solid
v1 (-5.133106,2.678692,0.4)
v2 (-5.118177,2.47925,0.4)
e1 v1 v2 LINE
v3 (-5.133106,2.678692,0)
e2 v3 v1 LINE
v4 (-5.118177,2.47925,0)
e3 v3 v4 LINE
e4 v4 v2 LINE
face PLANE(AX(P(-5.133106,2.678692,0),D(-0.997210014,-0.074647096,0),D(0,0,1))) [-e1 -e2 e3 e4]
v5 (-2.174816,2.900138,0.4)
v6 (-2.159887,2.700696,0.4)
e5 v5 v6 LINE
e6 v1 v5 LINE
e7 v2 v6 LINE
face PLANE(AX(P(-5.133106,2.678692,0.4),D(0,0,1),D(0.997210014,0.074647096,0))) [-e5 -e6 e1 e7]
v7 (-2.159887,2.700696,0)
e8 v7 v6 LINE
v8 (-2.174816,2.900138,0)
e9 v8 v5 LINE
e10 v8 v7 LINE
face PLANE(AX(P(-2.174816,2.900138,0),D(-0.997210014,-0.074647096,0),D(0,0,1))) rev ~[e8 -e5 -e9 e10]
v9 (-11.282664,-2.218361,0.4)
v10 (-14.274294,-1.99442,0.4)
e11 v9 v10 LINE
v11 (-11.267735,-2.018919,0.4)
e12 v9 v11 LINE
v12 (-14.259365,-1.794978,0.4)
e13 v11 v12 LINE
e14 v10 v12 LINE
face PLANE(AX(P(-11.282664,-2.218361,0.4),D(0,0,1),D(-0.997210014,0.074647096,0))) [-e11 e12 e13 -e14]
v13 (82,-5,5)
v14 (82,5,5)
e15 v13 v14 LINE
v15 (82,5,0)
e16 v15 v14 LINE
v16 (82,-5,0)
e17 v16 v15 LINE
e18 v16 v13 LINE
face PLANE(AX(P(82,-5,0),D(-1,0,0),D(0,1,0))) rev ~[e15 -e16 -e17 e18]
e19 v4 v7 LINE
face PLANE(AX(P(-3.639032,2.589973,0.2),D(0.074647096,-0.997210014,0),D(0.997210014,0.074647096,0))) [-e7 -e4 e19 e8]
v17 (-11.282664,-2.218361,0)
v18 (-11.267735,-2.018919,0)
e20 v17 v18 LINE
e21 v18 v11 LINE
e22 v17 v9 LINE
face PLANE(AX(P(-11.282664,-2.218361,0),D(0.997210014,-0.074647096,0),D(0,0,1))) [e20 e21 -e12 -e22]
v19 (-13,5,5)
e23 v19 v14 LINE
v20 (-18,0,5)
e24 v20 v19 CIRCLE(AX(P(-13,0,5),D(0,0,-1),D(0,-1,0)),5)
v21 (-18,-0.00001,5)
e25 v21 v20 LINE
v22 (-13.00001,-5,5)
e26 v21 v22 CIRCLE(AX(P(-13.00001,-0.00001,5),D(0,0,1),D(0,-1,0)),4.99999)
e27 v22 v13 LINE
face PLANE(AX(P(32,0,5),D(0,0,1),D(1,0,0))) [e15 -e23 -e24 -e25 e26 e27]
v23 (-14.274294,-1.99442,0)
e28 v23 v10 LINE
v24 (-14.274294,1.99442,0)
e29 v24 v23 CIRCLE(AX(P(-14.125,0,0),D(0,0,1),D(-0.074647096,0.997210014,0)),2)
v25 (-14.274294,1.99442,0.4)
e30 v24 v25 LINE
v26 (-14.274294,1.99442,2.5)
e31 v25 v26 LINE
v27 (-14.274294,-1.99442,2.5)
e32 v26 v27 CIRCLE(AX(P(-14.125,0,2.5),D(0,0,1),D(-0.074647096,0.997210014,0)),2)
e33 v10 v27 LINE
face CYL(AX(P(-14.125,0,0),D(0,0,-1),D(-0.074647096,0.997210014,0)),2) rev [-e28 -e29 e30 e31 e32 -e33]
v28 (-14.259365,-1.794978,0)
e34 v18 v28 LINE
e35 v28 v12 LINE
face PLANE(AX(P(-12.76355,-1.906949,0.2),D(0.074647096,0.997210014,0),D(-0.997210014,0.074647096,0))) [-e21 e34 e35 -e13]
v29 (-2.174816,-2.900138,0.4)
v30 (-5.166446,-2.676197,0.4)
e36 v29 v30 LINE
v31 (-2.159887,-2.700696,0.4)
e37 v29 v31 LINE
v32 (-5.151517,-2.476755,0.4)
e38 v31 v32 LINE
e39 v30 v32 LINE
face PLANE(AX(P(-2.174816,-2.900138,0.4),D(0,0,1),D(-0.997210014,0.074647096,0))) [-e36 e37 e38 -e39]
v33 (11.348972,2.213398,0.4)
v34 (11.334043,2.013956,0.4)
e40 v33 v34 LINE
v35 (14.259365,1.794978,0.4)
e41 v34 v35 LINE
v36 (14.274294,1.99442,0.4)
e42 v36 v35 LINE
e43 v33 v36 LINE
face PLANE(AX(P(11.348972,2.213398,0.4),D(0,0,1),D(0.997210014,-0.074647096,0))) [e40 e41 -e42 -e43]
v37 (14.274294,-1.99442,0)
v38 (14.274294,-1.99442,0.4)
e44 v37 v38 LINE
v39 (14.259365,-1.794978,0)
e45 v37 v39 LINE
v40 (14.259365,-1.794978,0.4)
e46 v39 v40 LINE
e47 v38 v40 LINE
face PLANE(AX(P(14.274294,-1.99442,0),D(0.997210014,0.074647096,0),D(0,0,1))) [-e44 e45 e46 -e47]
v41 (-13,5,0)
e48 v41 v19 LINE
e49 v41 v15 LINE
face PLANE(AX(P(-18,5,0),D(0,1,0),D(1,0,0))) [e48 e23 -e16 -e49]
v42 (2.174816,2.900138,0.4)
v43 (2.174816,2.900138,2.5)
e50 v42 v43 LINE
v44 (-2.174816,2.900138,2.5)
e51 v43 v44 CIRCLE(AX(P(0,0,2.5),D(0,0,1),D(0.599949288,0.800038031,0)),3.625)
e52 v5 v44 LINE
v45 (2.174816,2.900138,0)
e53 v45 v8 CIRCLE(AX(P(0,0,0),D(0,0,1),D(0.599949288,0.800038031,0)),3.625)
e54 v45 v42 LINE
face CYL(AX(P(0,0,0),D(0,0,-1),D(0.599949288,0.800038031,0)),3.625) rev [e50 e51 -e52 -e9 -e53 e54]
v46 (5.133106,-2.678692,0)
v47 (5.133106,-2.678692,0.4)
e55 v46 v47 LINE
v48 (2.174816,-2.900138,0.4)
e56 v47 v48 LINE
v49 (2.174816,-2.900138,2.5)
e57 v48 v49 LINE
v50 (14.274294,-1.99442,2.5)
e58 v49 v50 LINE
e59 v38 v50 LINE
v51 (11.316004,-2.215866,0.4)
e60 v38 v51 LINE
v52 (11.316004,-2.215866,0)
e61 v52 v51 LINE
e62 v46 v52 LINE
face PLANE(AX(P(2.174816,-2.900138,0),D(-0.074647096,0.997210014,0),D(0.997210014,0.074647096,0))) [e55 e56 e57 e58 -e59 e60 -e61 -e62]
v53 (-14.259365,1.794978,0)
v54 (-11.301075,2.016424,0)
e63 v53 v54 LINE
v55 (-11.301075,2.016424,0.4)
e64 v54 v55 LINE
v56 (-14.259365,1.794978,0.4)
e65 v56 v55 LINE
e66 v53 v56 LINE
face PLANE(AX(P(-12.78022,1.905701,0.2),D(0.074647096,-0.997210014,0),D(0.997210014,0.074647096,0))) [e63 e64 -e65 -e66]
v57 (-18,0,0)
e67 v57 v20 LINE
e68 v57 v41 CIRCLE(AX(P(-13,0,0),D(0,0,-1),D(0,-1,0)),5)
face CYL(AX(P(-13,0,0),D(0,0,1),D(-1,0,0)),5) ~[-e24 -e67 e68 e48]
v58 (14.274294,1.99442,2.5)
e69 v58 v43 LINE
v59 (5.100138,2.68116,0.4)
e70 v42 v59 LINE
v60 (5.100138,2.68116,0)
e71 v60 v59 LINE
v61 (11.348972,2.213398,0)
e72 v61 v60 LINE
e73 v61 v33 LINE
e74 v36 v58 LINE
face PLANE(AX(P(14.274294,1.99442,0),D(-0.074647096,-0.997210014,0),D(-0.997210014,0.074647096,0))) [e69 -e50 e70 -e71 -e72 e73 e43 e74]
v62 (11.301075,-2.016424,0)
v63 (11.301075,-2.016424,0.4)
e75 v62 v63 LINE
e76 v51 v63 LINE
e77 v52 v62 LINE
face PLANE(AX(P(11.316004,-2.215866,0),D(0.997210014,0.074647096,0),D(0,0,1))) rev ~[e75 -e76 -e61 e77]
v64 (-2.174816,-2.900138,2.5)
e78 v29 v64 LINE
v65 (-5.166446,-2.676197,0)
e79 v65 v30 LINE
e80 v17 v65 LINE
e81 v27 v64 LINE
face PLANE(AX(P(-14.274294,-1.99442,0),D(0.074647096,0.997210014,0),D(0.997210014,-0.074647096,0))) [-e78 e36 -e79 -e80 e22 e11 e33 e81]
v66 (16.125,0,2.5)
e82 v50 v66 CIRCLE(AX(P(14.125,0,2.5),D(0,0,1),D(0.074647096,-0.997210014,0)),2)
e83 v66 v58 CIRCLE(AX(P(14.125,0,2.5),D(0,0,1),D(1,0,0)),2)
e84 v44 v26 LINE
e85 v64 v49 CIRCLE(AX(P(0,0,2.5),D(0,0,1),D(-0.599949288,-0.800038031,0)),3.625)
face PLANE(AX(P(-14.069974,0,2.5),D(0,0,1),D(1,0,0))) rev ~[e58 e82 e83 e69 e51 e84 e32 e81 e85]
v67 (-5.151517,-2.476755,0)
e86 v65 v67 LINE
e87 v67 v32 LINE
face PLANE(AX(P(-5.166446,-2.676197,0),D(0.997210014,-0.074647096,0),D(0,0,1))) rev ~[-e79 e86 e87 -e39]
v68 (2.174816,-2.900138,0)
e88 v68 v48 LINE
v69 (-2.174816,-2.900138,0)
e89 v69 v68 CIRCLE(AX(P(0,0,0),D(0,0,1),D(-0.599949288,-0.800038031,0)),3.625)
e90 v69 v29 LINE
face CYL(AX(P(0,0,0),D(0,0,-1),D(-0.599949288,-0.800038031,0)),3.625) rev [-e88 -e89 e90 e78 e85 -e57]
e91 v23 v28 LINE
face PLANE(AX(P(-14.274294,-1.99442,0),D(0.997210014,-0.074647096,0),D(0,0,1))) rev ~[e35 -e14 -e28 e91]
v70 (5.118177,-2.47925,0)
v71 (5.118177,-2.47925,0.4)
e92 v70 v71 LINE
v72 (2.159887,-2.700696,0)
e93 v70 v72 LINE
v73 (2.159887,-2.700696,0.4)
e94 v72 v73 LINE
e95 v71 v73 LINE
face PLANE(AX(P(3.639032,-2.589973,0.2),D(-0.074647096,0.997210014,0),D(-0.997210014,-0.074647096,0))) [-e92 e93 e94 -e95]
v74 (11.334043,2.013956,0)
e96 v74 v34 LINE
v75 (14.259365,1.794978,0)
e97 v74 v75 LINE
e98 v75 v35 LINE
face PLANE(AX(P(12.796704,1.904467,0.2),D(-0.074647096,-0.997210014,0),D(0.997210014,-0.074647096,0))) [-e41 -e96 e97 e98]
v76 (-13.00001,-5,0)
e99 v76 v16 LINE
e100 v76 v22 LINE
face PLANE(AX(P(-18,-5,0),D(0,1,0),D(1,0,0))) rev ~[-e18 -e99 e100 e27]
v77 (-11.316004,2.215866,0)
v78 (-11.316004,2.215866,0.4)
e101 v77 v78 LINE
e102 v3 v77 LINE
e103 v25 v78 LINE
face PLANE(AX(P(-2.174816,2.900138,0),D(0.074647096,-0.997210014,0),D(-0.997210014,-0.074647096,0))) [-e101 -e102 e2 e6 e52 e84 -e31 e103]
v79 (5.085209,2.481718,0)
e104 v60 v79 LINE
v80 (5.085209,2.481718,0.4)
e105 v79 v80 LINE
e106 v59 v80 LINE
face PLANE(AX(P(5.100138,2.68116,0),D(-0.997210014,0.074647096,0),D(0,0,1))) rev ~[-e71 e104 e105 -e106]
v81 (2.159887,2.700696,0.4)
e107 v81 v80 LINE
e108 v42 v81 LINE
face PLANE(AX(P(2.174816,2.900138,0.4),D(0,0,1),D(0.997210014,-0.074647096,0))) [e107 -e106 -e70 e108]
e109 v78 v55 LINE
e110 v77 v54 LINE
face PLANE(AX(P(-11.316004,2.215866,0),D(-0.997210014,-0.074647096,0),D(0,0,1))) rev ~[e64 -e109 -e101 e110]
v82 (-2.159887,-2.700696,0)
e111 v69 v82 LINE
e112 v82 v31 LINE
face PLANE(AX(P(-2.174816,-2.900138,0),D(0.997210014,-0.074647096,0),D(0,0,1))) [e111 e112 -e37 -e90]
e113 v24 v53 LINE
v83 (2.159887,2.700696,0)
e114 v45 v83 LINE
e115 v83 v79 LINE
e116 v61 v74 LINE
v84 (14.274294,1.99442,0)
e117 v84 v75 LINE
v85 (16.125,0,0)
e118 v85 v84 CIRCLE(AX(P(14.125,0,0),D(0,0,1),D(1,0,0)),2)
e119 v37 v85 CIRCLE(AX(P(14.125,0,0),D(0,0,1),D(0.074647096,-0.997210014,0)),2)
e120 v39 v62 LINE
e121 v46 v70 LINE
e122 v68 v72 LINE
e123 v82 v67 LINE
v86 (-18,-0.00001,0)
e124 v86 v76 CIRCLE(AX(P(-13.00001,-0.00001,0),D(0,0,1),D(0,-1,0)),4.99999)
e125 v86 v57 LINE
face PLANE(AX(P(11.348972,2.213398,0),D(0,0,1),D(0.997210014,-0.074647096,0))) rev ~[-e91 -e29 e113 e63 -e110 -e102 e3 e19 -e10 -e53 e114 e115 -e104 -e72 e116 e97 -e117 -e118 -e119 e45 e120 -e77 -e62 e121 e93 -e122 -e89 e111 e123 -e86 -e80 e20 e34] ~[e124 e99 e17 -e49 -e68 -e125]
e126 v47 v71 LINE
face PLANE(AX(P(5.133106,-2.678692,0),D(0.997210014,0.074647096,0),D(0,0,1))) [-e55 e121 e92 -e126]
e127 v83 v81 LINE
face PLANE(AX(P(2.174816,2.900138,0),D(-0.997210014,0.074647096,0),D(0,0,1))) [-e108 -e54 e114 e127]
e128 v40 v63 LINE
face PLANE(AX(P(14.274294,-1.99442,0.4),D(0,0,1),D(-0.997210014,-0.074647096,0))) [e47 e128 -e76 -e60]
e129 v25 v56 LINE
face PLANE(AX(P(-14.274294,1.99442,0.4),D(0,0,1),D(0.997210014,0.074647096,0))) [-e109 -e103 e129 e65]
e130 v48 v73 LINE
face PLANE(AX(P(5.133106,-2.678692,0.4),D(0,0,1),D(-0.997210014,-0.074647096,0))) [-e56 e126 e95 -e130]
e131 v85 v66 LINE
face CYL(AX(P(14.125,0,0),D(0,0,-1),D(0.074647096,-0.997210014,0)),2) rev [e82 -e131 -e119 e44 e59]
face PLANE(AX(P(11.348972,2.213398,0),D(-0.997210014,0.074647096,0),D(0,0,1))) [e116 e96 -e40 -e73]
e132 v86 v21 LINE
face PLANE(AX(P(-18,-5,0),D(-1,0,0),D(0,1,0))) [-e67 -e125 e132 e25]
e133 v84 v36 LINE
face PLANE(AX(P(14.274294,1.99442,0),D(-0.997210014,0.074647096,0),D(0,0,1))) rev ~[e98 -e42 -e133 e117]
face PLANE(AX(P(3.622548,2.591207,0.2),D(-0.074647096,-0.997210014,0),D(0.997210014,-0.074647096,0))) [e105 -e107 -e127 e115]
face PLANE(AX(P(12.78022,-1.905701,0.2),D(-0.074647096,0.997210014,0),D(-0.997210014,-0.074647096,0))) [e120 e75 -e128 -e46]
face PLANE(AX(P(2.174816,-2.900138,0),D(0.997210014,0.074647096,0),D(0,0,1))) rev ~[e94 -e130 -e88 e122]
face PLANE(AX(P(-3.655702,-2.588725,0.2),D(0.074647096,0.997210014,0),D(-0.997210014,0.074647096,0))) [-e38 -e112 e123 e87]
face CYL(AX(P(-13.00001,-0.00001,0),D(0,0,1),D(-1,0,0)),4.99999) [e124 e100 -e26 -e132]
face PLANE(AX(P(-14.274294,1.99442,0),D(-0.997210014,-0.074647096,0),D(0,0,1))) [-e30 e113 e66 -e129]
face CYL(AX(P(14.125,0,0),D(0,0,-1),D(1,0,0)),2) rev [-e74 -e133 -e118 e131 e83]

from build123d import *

# Parameters (mm, degrees)
F1_W      = 100
F1_H      = 10
F2_DEPTH  = 5
F3_DEPTH  = 2.5
F4_R      = 5
F5_R      = 4.99999
F6_W      = 3
F6_H      = 0.4
F7_DEPTH  = 0.2
F8_W      = 2.9665668664
F8_H      = 0.4
F9_DEPTH  = 0.2
F10_W     = 2.9665668664
F10_H     = 0.4
F11_DEPTH = 0.2
F12_W     = 2.9335063244
F12_H     = 0.4
F13_DEPTH = 0.2


# Not quite as in the source:
# - a fillet or chamfer is up to 0.001 mm smaller than in the source, because OpenCascade refuses the exact size


with BuildPart() as f2:
    # F1 (on Top) → F2 (new body)
    with BuildSketch(Plane.XY):
        with Locations((32, 0)):
            Rectangle(F1_W, F1_H)
    extrude(amount=F2_DEPTH)

    # F0 (on Top) → F3 (cut)
    with BuildSketch(Plane.XY):
        with BuildLine():
            ThreePointArc((-14.2742941918, -1.9944200271), (-12.7645935136, -1.4660471315), (-12.125, 0))
            ThreePointArc((-12.125, 0), (-12.7645935136, 1.4660471315), (-14.2742941918, 1.9944200271))
            ThreePointArc((-14.2742941918, 1.9944200271), (-16.125, 0), (-14.2742941918, -1.9944200271))
        make_face()
        with BuildLine():
            ThreePointArc((-14.2742941918, 1.9944200271), (-12.7645935136, 1.4660471315), (-12.125, 0))
            ThreePointArc((-12.125, 0), (-12.7645935136, -1.4660471315), (-14.2742941918, -1.9944200271))
            Line((-14.2742941918, -1.9944200271), (-2.1748161696, -2.9001378637))
            ThreePointArc((-2.1748161696, -2.9001378637), (-3.625, 0), (-2.1748161696, 2.9001378637))
            Line((-2.1748161696, 2.9001378637), (-14.2742941918, 1.9944200271))
        make_face()
        with BuildLine():
            Line((0, 3.0629357789), (-2.1748161696, 2.9001378637))
            ThreePointArc((-2.1748161696, 2.9001378637), (-3.625, 0), (-2.1748161696, -2.9001378637))
            Line((-2.1748161696, -2.9001378637), (0, -3.0629357789))
            Line((0, -3.0629357789), (2.1748161696, -2.9001378637))
            ThreePointArc((2.1748161696, -2.9001378637), (3.2422471848, -1.6212520448), (3.625, 0))
            ThreePointArc((3.625, 0), (3.2422471848, 1.6212520448), (2.1748161696, 2.9001378637))
            Line((2.1748161696, 2.9001378637), (0, 3.0629357789))
        make_face()
        with BuildLine():
            ThreePointArc((2.1748161696, 2.9001378637), (0, 3.625), (-2.1748161696, 2.9001378637))
            Line((-2.1748161696, 2.9001378637), (0, 3.0629357789))
            Line((0, 3.0629357789), (2.1748161696, 2.9001378637))
        make_face()
        with BuildLine():
            Line((0, -3.0629357789), (-2.1748161696, -2.9001378637))
            ThreePointArc((-2.1748161696, -2.9001378637), (0, -3.625), (2.1748161696, -2.9001378637))
            Line((2.1748161696, -2.9001378637), (0, -3.0629357789))
        make_face()
        with BuildLine():
            Line((14.2742941918, 1.9944200271), (2.1748161696, 2.9001378637))
            ThreePointArc((2.1748161696, 2.9001378637), (3.2422471848, 1.6212520448), (3.625, 0))
            ThreePointArc((3.625, 0), (3.2422471848, -1.6212520448), (2.1748161696, -2.9001378637))
            Line((2.1748161696, -2.9001378637), (14.2742941918, -1.9944200271))
            ThreePointArc((14.2742941918, -1.9944200271), (12.125, 0), (14.2742941918, 1.9944200271))
        make_face()
        with BuildLine():
            ThreePointArc((16.125, 0), (15.5910471315, 1.3604064864), (14.2742941918, 1.9944200271))
            ThreePointArc((14.2742941918, 1.9944200271), (12.125, 0), (14.2742941918, -1.9944200271))
            ThreePointArc((14.2742941918, -1.9944200271), (15.5910471315, -1.3604064864), (16.125, 0))
        make_face()
    extrude(amount=F3_DEPTH, mode=Mode.SUBTRACT)

    # F4
    f4_edges = [f2.edges().sort_by_distance(p)[0] for p in [
        (-18, 5, 2.5),
    ]]
    fillet(f4_edges, radius=F4_R)

    # F5 (radius 5 in the source; OpenCascade refuses exactly that, so slightly less here)
    f5_edges = [f2.edges().sort_by_distance(p)[0] for p in [
        (-18, -5, 2.5),
    ]]
    fillet(f5_edges, radius=F5_R)

    # F6 (on face) → F7 (join)
    with BuildSketch(Plane(origin=(-0.2280013604, -3.045868522, 0), x_dir=(-0.9972100135, 0.0746470959, 0), z_dir=(0.0746470959, 0.9972100135, 0))):
        with Locations((12.585591441, 0.2)):
            Rectangle(F6_W, F6_H)
        with Locations((3.4522615926, 0.2)):
            Rectangle(F6_W, F6_H)
    extrude(amount=F7_DEPTH)

    # F8 (on face) → F9 (join)
    with BuildSketch(Plane(origin=(0.2280013604, -3.045868522, 0), x_dir=(-0.9972100135, -0.0746470959, 0), z_dir=(-0.0746470959, 0.9972100135, 0))):
        with Locations((-3.4355450259, 0.2)):
            Rectangle(F8_W, F8_H)
        with Locations((-12.6023080078, 0.2)):
            Rectangle(F8_W, F8_H)
    extrude(amount=F9_DEPTH)

    # F10 (on face) → F11 (join)
    with BuildSketch(Plane(origin=(-0.2280013604, 3.045868522, 0), x_dir=(0.9972100135, 0.0746470959, 0), z_dir=(0.0746470959, -0.9972100135, 0))):
        with Locations((-3.4355450259, 0.2)):
            Rectangle(F10_W, F10_H)
        with Locations((-12.6023080078, 0.2)):
            Rectangle(F10_W, F10_H)
    extrude(amount=F11_DEPTH)

    # F12 (on face) → F13 (join)
    with BuildSketch(Plane(origin=(0.2280013604, 3.045868522, 0), x_dir=(0.9972100135, -0.0746470959, 0), z_dir=(-0.0746470959, -0.9972100135, 0))):
        with Locations((12.6188382789, 0.2)):
            Rectangle(F12_W, F12_H)
        with Locations((3.4190147548, 0.2)):
            Rectangle(F12_W, F12_H)
    extrude(amount=F13_DEPTH)


solid = f2.part
